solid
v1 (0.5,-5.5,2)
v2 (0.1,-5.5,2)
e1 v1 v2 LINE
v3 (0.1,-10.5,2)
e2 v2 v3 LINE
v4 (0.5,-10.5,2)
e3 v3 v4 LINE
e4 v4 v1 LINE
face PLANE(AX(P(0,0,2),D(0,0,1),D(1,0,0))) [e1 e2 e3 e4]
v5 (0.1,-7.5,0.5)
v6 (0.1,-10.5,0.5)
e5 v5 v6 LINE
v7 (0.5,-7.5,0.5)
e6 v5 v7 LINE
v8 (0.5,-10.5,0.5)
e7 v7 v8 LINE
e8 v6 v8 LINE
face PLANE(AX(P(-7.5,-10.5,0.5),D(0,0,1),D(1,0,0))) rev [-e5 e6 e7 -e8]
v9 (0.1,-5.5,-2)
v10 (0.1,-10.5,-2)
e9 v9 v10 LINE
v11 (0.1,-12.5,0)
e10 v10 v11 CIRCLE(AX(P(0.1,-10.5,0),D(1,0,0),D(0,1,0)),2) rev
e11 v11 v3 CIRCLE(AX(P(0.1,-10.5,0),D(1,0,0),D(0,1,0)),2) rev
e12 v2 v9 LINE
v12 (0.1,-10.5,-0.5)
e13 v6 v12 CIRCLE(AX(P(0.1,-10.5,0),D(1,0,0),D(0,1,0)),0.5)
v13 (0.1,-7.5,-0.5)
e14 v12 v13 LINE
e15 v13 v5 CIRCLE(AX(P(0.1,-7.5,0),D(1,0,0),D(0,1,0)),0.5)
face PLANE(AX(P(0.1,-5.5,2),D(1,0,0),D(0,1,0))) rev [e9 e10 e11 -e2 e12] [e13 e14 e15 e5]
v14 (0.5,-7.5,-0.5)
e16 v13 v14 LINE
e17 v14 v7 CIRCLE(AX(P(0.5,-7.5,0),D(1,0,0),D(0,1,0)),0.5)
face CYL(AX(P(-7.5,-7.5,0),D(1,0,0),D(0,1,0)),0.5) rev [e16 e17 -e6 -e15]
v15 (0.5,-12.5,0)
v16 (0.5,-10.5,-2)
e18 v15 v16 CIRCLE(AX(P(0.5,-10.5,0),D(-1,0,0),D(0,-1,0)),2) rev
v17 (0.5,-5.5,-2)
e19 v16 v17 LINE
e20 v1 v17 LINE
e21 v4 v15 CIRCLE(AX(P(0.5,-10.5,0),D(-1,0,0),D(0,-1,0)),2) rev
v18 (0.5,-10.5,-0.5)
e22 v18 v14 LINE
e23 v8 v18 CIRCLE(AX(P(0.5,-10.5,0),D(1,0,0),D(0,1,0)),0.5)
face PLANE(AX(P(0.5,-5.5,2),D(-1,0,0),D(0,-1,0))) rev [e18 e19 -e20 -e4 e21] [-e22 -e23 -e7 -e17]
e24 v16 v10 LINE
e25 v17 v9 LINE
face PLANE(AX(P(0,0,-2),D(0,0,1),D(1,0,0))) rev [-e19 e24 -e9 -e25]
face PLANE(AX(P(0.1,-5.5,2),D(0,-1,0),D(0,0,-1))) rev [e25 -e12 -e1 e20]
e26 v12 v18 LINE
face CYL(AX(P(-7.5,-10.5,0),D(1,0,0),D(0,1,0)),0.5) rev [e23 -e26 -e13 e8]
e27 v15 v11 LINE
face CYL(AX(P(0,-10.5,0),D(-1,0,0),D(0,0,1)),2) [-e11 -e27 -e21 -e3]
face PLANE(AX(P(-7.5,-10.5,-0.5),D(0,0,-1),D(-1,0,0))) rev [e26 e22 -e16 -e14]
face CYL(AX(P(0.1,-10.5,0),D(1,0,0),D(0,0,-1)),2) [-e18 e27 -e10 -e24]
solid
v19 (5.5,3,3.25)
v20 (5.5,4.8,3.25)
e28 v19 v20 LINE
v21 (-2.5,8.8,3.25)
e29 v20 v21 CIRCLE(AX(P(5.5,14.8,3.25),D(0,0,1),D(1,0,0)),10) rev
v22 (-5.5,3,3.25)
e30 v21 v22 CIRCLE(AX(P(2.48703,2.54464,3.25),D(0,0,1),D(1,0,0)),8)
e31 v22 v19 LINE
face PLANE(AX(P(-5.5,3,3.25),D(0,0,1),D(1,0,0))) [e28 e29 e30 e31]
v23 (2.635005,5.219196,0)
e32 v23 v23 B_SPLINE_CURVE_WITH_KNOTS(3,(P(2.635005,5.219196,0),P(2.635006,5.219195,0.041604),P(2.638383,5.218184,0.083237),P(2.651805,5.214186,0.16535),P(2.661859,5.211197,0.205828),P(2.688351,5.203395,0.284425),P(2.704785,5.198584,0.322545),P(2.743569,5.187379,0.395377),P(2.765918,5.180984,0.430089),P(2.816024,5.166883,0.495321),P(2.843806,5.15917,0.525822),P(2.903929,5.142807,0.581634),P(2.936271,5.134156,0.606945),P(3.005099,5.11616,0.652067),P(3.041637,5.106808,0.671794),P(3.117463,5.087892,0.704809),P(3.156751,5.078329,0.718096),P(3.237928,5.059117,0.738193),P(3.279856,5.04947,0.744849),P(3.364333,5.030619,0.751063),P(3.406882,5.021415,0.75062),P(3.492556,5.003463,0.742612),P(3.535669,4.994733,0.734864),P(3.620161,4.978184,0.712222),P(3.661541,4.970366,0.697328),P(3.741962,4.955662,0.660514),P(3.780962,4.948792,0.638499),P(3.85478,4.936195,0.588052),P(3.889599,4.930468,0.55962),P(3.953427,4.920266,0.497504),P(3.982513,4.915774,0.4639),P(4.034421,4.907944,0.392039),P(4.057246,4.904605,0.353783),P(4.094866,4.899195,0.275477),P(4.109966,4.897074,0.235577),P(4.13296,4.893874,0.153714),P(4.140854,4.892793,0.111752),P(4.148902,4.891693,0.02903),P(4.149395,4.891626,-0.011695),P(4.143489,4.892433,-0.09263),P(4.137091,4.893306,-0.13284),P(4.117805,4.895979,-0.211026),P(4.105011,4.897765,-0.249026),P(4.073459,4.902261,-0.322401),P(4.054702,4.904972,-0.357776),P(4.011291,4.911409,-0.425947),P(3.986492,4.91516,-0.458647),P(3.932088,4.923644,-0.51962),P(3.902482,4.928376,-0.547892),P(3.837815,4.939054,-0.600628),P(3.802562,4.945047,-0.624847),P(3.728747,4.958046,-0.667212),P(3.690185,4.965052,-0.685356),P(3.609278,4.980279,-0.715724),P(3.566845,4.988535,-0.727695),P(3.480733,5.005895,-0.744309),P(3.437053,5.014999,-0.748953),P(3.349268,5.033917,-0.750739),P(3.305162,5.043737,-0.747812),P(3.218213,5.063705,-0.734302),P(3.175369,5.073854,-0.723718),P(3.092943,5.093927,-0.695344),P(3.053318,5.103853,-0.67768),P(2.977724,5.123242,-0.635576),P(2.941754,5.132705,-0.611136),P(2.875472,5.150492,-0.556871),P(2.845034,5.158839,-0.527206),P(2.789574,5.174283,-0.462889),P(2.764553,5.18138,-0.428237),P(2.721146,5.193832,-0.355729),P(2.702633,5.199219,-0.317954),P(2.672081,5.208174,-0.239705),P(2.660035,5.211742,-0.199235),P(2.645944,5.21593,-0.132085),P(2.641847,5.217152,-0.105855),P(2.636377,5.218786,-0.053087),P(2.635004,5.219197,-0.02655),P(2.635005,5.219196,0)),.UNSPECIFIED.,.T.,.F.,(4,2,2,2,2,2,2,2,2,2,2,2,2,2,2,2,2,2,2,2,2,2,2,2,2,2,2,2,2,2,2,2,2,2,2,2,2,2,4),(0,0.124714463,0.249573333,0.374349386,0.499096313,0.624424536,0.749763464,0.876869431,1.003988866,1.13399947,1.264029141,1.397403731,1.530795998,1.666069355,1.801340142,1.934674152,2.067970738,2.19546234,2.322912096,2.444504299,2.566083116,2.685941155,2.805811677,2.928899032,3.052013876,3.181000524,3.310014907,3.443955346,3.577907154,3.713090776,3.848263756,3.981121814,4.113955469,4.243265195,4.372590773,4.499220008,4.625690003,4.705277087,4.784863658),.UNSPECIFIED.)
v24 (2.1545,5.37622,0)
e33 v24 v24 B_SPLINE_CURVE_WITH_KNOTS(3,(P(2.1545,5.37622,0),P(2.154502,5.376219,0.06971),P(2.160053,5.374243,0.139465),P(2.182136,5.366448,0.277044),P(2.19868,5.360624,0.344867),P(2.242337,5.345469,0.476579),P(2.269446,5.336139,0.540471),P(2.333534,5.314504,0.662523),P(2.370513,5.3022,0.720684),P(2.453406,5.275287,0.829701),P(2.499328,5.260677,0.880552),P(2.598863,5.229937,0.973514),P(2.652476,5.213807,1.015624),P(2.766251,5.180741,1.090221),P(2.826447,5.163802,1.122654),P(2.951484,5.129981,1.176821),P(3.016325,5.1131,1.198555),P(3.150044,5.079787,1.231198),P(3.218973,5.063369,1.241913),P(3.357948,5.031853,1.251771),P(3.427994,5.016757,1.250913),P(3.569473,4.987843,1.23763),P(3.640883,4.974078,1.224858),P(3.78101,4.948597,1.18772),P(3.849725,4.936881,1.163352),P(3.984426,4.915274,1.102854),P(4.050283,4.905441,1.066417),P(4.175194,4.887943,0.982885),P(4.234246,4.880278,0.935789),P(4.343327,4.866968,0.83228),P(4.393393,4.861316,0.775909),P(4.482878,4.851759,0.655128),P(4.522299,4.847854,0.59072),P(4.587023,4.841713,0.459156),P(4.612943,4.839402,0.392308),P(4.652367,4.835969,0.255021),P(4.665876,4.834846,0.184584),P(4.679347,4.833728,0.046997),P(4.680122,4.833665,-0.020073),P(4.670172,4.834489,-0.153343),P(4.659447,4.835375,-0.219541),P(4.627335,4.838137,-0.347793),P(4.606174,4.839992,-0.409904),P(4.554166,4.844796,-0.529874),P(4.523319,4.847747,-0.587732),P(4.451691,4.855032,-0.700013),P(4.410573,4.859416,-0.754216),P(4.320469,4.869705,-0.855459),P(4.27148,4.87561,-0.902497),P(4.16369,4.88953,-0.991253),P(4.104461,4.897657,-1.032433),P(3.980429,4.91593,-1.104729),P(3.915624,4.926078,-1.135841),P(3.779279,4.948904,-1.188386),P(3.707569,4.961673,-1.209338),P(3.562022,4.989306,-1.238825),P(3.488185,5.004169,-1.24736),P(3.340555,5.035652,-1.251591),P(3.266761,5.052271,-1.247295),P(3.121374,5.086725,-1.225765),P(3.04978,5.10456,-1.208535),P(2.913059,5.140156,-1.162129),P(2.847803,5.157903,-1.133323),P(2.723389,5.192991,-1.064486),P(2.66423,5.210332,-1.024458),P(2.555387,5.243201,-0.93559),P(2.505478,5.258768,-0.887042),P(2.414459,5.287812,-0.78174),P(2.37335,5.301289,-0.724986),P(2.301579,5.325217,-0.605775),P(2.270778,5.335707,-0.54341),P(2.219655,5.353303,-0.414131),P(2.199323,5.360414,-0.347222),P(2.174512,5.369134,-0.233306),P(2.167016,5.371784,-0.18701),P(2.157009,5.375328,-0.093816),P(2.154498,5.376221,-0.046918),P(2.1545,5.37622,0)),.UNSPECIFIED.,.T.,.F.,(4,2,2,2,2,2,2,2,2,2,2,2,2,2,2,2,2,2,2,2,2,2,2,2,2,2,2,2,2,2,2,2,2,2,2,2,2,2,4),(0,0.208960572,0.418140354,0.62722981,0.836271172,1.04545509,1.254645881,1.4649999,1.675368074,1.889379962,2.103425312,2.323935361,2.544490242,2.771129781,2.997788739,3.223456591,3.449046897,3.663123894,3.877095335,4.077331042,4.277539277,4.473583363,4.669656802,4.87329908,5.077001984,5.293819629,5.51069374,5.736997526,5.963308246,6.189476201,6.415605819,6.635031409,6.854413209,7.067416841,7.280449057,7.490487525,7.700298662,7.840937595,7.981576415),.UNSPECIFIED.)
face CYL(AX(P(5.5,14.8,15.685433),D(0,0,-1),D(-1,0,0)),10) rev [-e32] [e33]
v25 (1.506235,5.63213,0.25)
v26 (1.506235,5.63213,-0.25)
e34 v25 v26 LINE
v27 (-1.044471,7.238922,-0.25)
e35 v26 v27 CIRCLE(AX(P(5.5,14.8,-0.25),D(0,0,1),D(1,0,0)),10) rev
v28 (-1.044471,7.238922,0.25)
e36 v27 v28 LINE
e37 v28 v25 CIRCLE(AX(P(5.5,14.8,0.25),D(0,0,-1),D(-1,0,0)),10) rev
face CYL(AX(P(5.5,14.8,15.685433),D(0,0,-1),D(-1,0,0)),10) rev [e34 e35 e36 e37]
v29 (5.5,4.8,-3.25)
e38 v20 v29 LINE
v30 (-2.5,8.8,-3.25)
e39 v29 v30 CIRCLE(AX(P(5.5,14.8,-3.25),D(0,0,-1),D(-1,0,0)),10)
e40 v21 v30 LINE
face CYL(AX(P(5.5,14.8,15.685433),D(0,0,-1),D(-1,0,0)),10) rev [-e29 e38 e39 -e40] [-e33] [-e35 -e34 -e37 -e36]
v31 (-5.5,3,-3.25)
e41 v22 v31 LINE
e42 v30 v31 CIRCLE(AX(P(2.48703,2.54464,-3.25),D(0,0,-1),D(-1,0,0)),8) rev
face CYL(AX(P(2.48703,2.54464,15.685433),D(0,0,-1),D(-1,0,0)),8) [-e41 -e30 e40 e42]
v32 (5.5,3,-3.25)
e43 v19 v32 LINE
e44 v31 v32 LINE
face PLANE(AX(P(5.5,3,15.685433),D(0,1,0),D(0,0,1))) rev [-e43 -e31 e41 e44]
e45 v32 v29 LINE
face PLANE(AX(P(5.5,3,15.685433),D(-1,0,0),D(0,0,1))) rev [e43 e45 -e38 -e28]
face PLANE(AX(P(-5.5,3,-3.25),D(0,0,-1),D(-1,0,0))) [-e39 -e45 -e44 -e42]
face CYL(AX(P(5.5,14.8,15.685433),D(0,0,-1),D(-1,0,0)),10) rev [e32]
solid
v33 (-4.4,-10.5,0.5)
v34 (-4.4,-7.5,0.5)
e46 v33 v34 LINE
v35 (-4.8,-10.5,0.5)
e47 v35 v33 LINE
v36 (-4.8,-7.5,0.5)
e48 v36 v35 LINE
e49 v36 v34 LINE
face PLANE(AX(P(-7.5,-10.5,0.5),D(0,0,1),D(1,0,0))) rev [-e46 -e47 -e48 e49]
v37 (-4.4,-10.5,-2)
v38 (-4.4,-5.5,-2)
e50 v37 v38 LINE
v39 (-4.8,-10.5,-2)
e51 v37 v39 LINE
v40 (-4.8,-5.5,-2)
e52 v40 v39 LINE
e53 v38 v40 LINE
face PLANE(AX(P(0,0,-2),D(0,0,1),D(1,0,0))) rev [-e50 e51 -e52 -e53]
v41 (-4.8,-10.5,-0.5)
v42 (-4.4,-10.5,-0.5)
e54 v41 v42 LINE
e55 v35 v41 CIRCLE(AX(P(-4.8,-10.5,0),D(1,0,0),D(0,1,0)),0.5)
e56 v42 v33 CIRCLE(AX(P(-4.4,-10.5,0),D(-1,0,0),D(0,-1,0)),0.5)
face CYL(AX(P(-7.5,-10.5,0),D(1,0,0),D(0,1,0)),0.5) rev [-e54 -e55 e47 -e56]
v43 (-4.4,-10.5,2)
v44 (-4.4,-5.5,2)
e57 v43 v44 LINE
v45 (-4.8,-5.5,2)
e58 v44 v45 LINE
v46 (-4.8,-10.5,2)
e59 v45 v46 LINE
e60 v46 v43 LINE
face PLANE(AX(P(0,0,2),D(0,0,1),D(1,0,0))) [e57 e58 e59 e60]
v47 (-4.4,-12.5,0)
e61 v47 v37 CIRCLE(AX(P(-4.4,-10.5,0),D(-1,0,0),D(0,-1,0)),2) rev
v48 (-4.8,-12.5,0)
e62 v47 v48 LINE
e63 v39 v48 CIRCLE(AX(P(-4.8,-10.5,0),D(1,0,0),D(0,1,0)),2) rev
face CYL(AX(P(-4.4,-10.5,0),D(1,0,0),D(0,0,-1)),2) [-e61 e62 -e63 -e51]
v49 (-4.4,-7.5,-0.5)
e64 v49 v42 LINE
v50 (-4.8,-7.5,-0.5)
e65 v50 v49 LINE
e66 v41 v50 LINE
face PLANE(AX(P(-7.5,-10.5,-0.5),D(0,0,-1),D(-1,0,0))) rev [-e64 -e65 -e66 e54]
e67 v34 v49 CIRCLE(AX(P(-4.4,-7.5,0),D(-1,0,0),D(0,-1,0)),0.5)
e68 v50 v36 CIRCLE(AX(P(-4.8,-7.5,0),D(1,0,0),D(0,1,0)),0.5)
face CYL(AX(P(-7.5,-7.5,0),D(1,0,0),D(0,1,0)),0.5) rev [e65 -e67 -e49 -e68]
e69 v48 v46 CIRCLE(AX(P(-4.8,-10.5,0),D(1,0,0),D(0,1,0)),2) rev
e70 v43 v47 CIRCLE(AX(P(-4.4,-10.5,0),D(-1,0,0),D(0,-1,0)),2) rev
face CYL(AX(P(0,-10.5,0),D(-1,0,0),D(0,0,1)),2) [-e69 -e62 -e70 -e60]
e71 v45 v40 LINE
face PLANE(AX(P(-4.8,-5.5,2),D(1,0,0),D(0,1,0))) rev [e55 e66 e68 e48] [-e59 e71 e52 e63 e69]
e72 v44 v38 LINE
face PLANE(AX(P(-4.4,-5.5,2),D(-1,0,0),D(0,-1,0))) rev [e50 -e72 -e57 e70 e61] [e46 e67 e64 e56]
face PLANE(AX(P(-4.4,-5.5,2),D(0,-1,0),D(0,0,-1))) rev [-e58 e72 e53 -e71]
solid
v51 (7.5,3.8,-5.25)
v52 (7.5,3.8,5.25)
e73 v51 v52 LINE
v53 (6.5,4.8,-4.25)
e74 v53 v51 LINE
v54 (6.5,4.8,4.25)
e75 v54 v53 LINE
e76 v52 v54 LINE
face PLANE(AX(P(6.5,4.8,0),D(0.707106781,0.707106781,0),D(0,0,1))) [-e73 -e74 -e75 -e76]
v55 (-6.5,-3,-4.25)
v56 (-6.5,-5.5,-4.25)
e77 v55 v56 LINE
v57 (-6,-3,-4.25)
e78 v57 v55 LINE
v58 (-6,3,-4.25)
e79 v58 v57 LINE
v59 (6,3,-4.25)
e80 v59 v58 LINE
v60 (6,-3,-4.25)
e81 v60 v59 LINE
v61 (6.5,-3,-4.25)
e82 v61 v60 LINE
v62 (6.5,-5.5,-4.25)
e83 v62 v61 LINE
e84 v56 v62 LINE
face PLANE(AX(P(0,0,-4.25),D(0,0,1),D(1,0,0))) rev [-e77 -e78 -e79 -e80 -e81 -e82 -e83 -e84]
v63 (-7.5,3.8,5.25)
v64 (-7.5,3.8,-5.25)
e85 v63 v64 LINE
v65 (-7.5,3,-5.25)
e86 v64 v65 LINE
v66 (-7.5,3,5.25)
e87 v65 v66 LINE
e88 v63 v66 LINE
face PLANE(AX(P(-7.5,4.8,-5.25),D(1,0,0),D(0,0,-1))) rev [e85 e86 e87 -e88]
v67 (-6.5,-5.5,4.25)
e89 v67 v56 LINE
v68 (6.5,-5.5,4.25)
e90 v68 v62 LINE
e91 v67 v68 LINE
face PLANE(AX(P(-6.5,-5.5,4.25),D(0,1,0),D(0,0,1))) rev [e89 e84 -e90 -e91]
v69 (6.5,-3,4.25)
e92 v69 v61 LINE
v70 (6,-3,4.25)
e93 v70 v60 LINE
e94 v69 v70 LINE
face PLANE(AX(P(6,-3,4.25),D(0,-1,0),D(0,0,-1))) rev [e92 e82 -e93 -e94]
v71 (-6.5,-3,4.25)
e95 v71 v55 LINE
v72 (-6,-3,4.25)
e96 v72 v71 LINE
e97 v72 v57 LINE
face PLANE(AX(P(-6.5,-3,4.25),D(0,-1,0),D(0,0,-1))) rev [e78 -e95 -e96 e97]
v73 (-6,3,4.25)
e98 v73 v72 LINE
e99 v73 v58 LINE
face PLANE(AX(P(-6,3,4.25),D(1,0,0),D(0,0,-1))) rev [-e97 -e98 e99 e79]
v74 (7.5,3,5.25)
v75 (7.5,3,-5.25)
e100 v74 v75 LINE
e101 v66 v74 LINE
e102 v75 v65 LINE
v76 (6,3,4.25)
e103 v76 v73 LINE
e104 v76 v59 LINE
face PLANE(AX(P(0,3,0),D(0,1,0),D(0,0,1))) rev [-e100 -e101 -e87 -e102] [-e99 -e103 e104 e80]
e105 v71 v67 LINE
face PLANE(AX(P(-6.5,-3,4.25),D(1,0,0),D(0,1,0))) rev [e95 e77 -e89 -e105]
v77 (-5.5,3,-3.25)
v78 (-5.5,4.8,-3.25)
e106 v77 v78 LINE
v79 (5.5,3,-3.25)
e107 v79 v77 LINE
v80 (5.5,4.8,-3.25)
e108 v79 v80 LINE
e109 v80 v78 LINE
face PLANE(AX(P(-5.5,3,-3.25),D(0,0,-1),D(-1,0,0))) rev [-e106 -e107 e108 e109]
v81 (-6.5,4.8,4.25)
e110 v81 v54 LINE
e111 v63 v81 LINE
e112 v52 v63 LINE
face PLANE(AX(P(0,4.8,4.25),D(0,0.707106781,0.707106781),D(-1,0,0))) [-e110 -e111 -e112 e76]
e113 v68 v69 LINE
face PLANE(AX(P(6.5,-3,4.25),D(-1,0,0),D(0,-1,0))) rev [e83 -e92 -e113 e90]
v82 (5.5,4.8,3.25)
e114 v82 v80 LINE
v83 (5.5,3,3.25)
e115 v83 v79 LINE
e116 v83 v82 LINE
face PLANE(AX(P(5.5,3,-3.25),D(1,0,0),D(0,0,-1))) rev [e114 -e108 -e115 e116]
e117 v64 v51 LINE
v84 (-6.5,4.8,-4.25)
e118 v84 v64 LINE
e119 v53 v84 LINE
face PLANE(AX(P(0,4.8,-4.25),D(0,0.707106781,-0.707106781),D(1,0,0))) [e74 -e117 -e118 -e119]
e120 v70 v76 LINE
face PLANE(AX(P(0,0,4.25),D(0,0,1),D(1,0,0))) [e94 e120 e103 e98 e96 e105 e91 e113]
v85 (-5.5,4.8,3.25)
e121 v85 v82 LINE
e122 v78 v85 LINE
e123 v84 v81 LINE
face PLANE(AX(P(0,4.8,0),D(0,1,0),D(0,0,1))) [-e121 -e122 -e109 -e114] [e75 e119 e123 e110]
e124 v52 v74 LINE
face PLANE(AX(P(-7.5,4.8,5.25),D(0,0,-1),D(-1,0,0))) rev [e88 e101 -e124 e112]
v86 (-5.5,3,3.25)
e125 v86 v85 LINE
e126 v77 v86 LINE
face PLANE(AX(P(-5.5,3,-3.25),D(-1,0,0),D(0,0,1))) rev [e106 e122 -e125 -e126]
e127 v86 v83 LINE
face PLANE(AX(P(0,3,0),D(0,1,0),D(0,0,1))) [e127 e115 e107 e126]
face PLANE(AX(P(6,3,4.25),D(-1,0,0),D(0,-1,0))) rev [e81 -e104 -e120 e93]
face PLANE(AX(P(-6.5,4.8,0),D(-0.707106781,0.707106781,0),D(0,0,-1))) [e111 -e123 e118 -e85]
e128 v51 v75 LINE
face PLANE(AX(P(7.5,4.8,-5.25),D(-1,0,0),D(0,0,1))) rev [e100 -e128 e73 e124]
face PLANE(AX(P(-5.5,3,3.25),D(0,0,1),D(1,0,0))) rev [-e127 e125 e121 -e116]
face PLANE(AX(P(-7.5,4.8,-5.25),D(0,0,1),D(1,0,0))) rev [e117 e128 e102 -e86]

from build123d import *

# Parameters (mm, degrees)
SALIENTE_EXTRUIR1_DEPTH             = 4.25
CROQUIS2_W                          = 15
CROQUIS2_H                          = 10.5
SALIENTE_EXTRUIR2_DEPTH             = 1.8
CROQUIS3_W                          = 11
CROQUIS3_H                          = 6.5
CORTAR_EXTRUIR1_DEPTH               = 1.8
SALIENTE_EXTRUIR3_REACH             = 12.68
SALIENTE_EXTRUIR3_DIRECTION_2_REACH = 12.68
CROQUIS7_W                          = 0.4
CROQUIS7_H                          = 7
SALIENTE_EXTRUIR4_DEPTH             = 2
SALIENTE_EXTRUIR4_2_DEPTH           = 2
REDONDEO1_R                         = 2
REDONDEO2_R                         = 2
CORTAR_EXTRUIR2_DEPTH               = 16.742061491
CHAFL_N1_SIZE                       = 1


with BuildPart() as part:
    # Croquis1 → Saliente-Extruir1 (new, symmetric)
    with BuildSketch(Plane.XY):
        Polygon((6, -3), (6.5, -3), (6.5, -5.5), (-6.5, -5.5), (-6.5, -3), (-6, -3), (-6, 3), (6, 3), align=None)
    extrude(amount=SALIENTE_EXTRUIR1_DEPTH, both=True)

    # Croquis2 → Saliente-Extruir2 (add)
    with BuildSketch(Plane(origin=(0, 3, 0), x_dir=(1, 0, 0), z_dir=(0, 1, 0))):
        Rectangle(CROQUIS2_W, CROQUIS2_H)
    extrude(amount=SALIENTE_EXTRUIR2_DEPTH)

    # Croquis3 → Cortar-Extruir1 (cut)
    with BuildSketch(Plane(origin=(0, 4.8, 0), x_dir=(1, 0, 0), z_dir=(0, 1, 0))):
        Rectangle(CROQUIS3_W, CROQUIS3_H)
    extrude(amount=-CORTAR_EXTRUIR1_DEPTH, mode=Mode.SUBTRACT)


with BuildPart() as body_2:

    # Saliente-Extruir3: up to this face of the body (flat: up to its plane)
    saliente_extruir3_end = Plane(part.part.faces().sort_by_distance((0, 3.9, 3.25))[0])
    # Croquis4 → Saliente-Extruir3 (new, up to the picked face)
    with BuildSketch(Plane.XY, mode=Mode.PRIVATE) as saliente_extruir3_sk1:
        with BuildLine():
            Line((5.5, 3), (-5.5, 3))
            ThreePointArc((-5.5, 3), (-4.618711222, 6.220023046), (-2.5, 8.8))
            ThreePointArc((-2.5, 8.8), (1.027864045, 5.85572809), (5.5, 4.8))
            Line((5.5, 4.8), (5.5, 3))
        make_face()
    saliente_extruir3_tool1 = split(extrude(saliente_extruir3_sk1.sketch, amount=SALIENTE_EXTRUIR3_REACH, mode=Mode.PRIVATE), bisect_by=saliente_extruir3_end, keep=Keep.BOTH, mode=Mode.PRIVATE)
    add(saliente_extruir3_tool1.solids().sort_by(Axis((-0.768886, 4.883197, 0), (0, 0, 1)))[0])


    # Saliente-Extruir3 direction 2: up to this face of the body (flat: up to its plane)
    saliente_extruir3_direction_2_end = Plane(part.part.faces().sort_by_distance((0, 3.9, -3.25))[0])
    # Croquis4 → Saliente-Extruir3 direction 2 (add, up to the picked face)
    with BuildSketch(Plane.XY, mode=Mode.PRIVATE) as saliente_extruir3_direction_2_sk1:
        with BuildLine():
            Line((5.5, 3), (-5.5, 3))
            ThreePointArc((-5.5, 3), (-4.618711222, 6.220023046), (-2.5, 8.8))
            ThreePointArc((-2.5, 8.8), (1.027864045, 5.85572809), (5.5, 4.8))
            Line((5.5, 4.8), (5.5, 3))
        make_face()
    saliente_extruir3_direction_2_tool1 = split(extrude(saliente_extruir3_direction_2_sk1.sketch, amount=-SALIENTE_EXTRUIR3_DIRECTION_2_REACH, mode=Mode.PRIVATE), bisect_by=saliente_extruir3_direction_2_end, keep=Keep.BOTH, mode=Mode.PRIVATE)
    add(saliente_extruir3_direction_2_tool1.solids().sort_by(Axis((-0.768886, 4.883197, 0), (0, 0, -1)))[0])


with BuildPart() as body_3:
    # Croquis7 → Saliente-Extruir4 (new, symmetric)
    with BuildSketch(Plane.XY):
        with Locations((0.3, -9)):
            Rectangle(CROQUIS7_W, CROQUIS7_H)
    extrude(amount=SALIENTE_EXTRUIR4_DEPTH, both=True)

    # Redondeo2
    redondeo2_edges = [body_3.edges().sort_by_distance(p)[0] for p in [
        (0.3, -12.5, -2),
        (0.3, -12.5, 2),
    ]]
    fillet(redondeo2_edges, radius=REDONDEO2_R - 0.0001)  # a hair under: the kernel refuses the full size


with BuildPart() as body_4:
    # Croquis7 → Saliente-Extruir4 2 (new, symmetric)
    with BuildSketch(Plane.XY):
        with Locations((-4.6, -9)):
            Rectangle(CROQUIS7_W, CROQUIS7_H)
    extrude(amount=SALIENTE_EXTRUIR4_2_DEPTH, both=True)

    # Redondeo1
    redondeo1_edges = [body_4.edges().sort_by_distance(p)[0] for p in [
        (-4.6, -12.5, -2),
        (-4.6, -12.5, 2),
    ]]
    fillet(redondeo1_edges, radius=REDONDEO1_R - 0.0001)  # a hair under: the kernel refuses the full size


with BuildPart() as cortar_extruir2_tool:
    # Croquis9 → Cortar-Extruir2 (new, through all)
    with BuildSketch(Plane(origin=(0.5, 0, 0), x_dir=(0, 0, -1), z_dir=(1, 0, 0))):
        with BuildLine():
            Line((-0.5, -10.5), (-0.5, -7.5))
            ThreePointArc((-0.5, -7.5), (0, -7), (0.5, -7.5))
            Line((0.5, -7.5), (0.5, -10.5))
            ThreePointArc((0.5, -10.5), (0, -11), (-0.5, -10.5))
        make_face()
    extrude(amount=-CORTAR_EXTRUIR2_DEPTH)


with BuildPart() as body_3_1:
    add(body_3.part)

    # Cortar-Extruir2: cut by cortar_extruir2_tool
    add(cortar_extruir2_tool.part, mode=Mode.SUBTRACT)


with BuildPart() as body_4_1:
    add(body_4.part)

    # Cortar-Extruir2: cut by cortar_extruir2_tool
    add(cortar_extruir2_tool.part, mode=Mode.SUBTRACT)


with BuildPart() as part_1:
    add(part.part)

    # Chaflán1
    chafl_n1_edges = [part_1.edges().sort_by_distance(p)[0] for p in [
        (7.5, 4.8, 0),
        (0, 4.8, -5.25),
        (-7.5, 4.8, 0),
        (0, 4.8, 5.25),
    ]]
    chamfer(chafl_n1_edges, length=CHAFL_N1_SIZE)


solid = Compound([body_2.part, body_3_1.part, body_4_1.part, part_1.part])
